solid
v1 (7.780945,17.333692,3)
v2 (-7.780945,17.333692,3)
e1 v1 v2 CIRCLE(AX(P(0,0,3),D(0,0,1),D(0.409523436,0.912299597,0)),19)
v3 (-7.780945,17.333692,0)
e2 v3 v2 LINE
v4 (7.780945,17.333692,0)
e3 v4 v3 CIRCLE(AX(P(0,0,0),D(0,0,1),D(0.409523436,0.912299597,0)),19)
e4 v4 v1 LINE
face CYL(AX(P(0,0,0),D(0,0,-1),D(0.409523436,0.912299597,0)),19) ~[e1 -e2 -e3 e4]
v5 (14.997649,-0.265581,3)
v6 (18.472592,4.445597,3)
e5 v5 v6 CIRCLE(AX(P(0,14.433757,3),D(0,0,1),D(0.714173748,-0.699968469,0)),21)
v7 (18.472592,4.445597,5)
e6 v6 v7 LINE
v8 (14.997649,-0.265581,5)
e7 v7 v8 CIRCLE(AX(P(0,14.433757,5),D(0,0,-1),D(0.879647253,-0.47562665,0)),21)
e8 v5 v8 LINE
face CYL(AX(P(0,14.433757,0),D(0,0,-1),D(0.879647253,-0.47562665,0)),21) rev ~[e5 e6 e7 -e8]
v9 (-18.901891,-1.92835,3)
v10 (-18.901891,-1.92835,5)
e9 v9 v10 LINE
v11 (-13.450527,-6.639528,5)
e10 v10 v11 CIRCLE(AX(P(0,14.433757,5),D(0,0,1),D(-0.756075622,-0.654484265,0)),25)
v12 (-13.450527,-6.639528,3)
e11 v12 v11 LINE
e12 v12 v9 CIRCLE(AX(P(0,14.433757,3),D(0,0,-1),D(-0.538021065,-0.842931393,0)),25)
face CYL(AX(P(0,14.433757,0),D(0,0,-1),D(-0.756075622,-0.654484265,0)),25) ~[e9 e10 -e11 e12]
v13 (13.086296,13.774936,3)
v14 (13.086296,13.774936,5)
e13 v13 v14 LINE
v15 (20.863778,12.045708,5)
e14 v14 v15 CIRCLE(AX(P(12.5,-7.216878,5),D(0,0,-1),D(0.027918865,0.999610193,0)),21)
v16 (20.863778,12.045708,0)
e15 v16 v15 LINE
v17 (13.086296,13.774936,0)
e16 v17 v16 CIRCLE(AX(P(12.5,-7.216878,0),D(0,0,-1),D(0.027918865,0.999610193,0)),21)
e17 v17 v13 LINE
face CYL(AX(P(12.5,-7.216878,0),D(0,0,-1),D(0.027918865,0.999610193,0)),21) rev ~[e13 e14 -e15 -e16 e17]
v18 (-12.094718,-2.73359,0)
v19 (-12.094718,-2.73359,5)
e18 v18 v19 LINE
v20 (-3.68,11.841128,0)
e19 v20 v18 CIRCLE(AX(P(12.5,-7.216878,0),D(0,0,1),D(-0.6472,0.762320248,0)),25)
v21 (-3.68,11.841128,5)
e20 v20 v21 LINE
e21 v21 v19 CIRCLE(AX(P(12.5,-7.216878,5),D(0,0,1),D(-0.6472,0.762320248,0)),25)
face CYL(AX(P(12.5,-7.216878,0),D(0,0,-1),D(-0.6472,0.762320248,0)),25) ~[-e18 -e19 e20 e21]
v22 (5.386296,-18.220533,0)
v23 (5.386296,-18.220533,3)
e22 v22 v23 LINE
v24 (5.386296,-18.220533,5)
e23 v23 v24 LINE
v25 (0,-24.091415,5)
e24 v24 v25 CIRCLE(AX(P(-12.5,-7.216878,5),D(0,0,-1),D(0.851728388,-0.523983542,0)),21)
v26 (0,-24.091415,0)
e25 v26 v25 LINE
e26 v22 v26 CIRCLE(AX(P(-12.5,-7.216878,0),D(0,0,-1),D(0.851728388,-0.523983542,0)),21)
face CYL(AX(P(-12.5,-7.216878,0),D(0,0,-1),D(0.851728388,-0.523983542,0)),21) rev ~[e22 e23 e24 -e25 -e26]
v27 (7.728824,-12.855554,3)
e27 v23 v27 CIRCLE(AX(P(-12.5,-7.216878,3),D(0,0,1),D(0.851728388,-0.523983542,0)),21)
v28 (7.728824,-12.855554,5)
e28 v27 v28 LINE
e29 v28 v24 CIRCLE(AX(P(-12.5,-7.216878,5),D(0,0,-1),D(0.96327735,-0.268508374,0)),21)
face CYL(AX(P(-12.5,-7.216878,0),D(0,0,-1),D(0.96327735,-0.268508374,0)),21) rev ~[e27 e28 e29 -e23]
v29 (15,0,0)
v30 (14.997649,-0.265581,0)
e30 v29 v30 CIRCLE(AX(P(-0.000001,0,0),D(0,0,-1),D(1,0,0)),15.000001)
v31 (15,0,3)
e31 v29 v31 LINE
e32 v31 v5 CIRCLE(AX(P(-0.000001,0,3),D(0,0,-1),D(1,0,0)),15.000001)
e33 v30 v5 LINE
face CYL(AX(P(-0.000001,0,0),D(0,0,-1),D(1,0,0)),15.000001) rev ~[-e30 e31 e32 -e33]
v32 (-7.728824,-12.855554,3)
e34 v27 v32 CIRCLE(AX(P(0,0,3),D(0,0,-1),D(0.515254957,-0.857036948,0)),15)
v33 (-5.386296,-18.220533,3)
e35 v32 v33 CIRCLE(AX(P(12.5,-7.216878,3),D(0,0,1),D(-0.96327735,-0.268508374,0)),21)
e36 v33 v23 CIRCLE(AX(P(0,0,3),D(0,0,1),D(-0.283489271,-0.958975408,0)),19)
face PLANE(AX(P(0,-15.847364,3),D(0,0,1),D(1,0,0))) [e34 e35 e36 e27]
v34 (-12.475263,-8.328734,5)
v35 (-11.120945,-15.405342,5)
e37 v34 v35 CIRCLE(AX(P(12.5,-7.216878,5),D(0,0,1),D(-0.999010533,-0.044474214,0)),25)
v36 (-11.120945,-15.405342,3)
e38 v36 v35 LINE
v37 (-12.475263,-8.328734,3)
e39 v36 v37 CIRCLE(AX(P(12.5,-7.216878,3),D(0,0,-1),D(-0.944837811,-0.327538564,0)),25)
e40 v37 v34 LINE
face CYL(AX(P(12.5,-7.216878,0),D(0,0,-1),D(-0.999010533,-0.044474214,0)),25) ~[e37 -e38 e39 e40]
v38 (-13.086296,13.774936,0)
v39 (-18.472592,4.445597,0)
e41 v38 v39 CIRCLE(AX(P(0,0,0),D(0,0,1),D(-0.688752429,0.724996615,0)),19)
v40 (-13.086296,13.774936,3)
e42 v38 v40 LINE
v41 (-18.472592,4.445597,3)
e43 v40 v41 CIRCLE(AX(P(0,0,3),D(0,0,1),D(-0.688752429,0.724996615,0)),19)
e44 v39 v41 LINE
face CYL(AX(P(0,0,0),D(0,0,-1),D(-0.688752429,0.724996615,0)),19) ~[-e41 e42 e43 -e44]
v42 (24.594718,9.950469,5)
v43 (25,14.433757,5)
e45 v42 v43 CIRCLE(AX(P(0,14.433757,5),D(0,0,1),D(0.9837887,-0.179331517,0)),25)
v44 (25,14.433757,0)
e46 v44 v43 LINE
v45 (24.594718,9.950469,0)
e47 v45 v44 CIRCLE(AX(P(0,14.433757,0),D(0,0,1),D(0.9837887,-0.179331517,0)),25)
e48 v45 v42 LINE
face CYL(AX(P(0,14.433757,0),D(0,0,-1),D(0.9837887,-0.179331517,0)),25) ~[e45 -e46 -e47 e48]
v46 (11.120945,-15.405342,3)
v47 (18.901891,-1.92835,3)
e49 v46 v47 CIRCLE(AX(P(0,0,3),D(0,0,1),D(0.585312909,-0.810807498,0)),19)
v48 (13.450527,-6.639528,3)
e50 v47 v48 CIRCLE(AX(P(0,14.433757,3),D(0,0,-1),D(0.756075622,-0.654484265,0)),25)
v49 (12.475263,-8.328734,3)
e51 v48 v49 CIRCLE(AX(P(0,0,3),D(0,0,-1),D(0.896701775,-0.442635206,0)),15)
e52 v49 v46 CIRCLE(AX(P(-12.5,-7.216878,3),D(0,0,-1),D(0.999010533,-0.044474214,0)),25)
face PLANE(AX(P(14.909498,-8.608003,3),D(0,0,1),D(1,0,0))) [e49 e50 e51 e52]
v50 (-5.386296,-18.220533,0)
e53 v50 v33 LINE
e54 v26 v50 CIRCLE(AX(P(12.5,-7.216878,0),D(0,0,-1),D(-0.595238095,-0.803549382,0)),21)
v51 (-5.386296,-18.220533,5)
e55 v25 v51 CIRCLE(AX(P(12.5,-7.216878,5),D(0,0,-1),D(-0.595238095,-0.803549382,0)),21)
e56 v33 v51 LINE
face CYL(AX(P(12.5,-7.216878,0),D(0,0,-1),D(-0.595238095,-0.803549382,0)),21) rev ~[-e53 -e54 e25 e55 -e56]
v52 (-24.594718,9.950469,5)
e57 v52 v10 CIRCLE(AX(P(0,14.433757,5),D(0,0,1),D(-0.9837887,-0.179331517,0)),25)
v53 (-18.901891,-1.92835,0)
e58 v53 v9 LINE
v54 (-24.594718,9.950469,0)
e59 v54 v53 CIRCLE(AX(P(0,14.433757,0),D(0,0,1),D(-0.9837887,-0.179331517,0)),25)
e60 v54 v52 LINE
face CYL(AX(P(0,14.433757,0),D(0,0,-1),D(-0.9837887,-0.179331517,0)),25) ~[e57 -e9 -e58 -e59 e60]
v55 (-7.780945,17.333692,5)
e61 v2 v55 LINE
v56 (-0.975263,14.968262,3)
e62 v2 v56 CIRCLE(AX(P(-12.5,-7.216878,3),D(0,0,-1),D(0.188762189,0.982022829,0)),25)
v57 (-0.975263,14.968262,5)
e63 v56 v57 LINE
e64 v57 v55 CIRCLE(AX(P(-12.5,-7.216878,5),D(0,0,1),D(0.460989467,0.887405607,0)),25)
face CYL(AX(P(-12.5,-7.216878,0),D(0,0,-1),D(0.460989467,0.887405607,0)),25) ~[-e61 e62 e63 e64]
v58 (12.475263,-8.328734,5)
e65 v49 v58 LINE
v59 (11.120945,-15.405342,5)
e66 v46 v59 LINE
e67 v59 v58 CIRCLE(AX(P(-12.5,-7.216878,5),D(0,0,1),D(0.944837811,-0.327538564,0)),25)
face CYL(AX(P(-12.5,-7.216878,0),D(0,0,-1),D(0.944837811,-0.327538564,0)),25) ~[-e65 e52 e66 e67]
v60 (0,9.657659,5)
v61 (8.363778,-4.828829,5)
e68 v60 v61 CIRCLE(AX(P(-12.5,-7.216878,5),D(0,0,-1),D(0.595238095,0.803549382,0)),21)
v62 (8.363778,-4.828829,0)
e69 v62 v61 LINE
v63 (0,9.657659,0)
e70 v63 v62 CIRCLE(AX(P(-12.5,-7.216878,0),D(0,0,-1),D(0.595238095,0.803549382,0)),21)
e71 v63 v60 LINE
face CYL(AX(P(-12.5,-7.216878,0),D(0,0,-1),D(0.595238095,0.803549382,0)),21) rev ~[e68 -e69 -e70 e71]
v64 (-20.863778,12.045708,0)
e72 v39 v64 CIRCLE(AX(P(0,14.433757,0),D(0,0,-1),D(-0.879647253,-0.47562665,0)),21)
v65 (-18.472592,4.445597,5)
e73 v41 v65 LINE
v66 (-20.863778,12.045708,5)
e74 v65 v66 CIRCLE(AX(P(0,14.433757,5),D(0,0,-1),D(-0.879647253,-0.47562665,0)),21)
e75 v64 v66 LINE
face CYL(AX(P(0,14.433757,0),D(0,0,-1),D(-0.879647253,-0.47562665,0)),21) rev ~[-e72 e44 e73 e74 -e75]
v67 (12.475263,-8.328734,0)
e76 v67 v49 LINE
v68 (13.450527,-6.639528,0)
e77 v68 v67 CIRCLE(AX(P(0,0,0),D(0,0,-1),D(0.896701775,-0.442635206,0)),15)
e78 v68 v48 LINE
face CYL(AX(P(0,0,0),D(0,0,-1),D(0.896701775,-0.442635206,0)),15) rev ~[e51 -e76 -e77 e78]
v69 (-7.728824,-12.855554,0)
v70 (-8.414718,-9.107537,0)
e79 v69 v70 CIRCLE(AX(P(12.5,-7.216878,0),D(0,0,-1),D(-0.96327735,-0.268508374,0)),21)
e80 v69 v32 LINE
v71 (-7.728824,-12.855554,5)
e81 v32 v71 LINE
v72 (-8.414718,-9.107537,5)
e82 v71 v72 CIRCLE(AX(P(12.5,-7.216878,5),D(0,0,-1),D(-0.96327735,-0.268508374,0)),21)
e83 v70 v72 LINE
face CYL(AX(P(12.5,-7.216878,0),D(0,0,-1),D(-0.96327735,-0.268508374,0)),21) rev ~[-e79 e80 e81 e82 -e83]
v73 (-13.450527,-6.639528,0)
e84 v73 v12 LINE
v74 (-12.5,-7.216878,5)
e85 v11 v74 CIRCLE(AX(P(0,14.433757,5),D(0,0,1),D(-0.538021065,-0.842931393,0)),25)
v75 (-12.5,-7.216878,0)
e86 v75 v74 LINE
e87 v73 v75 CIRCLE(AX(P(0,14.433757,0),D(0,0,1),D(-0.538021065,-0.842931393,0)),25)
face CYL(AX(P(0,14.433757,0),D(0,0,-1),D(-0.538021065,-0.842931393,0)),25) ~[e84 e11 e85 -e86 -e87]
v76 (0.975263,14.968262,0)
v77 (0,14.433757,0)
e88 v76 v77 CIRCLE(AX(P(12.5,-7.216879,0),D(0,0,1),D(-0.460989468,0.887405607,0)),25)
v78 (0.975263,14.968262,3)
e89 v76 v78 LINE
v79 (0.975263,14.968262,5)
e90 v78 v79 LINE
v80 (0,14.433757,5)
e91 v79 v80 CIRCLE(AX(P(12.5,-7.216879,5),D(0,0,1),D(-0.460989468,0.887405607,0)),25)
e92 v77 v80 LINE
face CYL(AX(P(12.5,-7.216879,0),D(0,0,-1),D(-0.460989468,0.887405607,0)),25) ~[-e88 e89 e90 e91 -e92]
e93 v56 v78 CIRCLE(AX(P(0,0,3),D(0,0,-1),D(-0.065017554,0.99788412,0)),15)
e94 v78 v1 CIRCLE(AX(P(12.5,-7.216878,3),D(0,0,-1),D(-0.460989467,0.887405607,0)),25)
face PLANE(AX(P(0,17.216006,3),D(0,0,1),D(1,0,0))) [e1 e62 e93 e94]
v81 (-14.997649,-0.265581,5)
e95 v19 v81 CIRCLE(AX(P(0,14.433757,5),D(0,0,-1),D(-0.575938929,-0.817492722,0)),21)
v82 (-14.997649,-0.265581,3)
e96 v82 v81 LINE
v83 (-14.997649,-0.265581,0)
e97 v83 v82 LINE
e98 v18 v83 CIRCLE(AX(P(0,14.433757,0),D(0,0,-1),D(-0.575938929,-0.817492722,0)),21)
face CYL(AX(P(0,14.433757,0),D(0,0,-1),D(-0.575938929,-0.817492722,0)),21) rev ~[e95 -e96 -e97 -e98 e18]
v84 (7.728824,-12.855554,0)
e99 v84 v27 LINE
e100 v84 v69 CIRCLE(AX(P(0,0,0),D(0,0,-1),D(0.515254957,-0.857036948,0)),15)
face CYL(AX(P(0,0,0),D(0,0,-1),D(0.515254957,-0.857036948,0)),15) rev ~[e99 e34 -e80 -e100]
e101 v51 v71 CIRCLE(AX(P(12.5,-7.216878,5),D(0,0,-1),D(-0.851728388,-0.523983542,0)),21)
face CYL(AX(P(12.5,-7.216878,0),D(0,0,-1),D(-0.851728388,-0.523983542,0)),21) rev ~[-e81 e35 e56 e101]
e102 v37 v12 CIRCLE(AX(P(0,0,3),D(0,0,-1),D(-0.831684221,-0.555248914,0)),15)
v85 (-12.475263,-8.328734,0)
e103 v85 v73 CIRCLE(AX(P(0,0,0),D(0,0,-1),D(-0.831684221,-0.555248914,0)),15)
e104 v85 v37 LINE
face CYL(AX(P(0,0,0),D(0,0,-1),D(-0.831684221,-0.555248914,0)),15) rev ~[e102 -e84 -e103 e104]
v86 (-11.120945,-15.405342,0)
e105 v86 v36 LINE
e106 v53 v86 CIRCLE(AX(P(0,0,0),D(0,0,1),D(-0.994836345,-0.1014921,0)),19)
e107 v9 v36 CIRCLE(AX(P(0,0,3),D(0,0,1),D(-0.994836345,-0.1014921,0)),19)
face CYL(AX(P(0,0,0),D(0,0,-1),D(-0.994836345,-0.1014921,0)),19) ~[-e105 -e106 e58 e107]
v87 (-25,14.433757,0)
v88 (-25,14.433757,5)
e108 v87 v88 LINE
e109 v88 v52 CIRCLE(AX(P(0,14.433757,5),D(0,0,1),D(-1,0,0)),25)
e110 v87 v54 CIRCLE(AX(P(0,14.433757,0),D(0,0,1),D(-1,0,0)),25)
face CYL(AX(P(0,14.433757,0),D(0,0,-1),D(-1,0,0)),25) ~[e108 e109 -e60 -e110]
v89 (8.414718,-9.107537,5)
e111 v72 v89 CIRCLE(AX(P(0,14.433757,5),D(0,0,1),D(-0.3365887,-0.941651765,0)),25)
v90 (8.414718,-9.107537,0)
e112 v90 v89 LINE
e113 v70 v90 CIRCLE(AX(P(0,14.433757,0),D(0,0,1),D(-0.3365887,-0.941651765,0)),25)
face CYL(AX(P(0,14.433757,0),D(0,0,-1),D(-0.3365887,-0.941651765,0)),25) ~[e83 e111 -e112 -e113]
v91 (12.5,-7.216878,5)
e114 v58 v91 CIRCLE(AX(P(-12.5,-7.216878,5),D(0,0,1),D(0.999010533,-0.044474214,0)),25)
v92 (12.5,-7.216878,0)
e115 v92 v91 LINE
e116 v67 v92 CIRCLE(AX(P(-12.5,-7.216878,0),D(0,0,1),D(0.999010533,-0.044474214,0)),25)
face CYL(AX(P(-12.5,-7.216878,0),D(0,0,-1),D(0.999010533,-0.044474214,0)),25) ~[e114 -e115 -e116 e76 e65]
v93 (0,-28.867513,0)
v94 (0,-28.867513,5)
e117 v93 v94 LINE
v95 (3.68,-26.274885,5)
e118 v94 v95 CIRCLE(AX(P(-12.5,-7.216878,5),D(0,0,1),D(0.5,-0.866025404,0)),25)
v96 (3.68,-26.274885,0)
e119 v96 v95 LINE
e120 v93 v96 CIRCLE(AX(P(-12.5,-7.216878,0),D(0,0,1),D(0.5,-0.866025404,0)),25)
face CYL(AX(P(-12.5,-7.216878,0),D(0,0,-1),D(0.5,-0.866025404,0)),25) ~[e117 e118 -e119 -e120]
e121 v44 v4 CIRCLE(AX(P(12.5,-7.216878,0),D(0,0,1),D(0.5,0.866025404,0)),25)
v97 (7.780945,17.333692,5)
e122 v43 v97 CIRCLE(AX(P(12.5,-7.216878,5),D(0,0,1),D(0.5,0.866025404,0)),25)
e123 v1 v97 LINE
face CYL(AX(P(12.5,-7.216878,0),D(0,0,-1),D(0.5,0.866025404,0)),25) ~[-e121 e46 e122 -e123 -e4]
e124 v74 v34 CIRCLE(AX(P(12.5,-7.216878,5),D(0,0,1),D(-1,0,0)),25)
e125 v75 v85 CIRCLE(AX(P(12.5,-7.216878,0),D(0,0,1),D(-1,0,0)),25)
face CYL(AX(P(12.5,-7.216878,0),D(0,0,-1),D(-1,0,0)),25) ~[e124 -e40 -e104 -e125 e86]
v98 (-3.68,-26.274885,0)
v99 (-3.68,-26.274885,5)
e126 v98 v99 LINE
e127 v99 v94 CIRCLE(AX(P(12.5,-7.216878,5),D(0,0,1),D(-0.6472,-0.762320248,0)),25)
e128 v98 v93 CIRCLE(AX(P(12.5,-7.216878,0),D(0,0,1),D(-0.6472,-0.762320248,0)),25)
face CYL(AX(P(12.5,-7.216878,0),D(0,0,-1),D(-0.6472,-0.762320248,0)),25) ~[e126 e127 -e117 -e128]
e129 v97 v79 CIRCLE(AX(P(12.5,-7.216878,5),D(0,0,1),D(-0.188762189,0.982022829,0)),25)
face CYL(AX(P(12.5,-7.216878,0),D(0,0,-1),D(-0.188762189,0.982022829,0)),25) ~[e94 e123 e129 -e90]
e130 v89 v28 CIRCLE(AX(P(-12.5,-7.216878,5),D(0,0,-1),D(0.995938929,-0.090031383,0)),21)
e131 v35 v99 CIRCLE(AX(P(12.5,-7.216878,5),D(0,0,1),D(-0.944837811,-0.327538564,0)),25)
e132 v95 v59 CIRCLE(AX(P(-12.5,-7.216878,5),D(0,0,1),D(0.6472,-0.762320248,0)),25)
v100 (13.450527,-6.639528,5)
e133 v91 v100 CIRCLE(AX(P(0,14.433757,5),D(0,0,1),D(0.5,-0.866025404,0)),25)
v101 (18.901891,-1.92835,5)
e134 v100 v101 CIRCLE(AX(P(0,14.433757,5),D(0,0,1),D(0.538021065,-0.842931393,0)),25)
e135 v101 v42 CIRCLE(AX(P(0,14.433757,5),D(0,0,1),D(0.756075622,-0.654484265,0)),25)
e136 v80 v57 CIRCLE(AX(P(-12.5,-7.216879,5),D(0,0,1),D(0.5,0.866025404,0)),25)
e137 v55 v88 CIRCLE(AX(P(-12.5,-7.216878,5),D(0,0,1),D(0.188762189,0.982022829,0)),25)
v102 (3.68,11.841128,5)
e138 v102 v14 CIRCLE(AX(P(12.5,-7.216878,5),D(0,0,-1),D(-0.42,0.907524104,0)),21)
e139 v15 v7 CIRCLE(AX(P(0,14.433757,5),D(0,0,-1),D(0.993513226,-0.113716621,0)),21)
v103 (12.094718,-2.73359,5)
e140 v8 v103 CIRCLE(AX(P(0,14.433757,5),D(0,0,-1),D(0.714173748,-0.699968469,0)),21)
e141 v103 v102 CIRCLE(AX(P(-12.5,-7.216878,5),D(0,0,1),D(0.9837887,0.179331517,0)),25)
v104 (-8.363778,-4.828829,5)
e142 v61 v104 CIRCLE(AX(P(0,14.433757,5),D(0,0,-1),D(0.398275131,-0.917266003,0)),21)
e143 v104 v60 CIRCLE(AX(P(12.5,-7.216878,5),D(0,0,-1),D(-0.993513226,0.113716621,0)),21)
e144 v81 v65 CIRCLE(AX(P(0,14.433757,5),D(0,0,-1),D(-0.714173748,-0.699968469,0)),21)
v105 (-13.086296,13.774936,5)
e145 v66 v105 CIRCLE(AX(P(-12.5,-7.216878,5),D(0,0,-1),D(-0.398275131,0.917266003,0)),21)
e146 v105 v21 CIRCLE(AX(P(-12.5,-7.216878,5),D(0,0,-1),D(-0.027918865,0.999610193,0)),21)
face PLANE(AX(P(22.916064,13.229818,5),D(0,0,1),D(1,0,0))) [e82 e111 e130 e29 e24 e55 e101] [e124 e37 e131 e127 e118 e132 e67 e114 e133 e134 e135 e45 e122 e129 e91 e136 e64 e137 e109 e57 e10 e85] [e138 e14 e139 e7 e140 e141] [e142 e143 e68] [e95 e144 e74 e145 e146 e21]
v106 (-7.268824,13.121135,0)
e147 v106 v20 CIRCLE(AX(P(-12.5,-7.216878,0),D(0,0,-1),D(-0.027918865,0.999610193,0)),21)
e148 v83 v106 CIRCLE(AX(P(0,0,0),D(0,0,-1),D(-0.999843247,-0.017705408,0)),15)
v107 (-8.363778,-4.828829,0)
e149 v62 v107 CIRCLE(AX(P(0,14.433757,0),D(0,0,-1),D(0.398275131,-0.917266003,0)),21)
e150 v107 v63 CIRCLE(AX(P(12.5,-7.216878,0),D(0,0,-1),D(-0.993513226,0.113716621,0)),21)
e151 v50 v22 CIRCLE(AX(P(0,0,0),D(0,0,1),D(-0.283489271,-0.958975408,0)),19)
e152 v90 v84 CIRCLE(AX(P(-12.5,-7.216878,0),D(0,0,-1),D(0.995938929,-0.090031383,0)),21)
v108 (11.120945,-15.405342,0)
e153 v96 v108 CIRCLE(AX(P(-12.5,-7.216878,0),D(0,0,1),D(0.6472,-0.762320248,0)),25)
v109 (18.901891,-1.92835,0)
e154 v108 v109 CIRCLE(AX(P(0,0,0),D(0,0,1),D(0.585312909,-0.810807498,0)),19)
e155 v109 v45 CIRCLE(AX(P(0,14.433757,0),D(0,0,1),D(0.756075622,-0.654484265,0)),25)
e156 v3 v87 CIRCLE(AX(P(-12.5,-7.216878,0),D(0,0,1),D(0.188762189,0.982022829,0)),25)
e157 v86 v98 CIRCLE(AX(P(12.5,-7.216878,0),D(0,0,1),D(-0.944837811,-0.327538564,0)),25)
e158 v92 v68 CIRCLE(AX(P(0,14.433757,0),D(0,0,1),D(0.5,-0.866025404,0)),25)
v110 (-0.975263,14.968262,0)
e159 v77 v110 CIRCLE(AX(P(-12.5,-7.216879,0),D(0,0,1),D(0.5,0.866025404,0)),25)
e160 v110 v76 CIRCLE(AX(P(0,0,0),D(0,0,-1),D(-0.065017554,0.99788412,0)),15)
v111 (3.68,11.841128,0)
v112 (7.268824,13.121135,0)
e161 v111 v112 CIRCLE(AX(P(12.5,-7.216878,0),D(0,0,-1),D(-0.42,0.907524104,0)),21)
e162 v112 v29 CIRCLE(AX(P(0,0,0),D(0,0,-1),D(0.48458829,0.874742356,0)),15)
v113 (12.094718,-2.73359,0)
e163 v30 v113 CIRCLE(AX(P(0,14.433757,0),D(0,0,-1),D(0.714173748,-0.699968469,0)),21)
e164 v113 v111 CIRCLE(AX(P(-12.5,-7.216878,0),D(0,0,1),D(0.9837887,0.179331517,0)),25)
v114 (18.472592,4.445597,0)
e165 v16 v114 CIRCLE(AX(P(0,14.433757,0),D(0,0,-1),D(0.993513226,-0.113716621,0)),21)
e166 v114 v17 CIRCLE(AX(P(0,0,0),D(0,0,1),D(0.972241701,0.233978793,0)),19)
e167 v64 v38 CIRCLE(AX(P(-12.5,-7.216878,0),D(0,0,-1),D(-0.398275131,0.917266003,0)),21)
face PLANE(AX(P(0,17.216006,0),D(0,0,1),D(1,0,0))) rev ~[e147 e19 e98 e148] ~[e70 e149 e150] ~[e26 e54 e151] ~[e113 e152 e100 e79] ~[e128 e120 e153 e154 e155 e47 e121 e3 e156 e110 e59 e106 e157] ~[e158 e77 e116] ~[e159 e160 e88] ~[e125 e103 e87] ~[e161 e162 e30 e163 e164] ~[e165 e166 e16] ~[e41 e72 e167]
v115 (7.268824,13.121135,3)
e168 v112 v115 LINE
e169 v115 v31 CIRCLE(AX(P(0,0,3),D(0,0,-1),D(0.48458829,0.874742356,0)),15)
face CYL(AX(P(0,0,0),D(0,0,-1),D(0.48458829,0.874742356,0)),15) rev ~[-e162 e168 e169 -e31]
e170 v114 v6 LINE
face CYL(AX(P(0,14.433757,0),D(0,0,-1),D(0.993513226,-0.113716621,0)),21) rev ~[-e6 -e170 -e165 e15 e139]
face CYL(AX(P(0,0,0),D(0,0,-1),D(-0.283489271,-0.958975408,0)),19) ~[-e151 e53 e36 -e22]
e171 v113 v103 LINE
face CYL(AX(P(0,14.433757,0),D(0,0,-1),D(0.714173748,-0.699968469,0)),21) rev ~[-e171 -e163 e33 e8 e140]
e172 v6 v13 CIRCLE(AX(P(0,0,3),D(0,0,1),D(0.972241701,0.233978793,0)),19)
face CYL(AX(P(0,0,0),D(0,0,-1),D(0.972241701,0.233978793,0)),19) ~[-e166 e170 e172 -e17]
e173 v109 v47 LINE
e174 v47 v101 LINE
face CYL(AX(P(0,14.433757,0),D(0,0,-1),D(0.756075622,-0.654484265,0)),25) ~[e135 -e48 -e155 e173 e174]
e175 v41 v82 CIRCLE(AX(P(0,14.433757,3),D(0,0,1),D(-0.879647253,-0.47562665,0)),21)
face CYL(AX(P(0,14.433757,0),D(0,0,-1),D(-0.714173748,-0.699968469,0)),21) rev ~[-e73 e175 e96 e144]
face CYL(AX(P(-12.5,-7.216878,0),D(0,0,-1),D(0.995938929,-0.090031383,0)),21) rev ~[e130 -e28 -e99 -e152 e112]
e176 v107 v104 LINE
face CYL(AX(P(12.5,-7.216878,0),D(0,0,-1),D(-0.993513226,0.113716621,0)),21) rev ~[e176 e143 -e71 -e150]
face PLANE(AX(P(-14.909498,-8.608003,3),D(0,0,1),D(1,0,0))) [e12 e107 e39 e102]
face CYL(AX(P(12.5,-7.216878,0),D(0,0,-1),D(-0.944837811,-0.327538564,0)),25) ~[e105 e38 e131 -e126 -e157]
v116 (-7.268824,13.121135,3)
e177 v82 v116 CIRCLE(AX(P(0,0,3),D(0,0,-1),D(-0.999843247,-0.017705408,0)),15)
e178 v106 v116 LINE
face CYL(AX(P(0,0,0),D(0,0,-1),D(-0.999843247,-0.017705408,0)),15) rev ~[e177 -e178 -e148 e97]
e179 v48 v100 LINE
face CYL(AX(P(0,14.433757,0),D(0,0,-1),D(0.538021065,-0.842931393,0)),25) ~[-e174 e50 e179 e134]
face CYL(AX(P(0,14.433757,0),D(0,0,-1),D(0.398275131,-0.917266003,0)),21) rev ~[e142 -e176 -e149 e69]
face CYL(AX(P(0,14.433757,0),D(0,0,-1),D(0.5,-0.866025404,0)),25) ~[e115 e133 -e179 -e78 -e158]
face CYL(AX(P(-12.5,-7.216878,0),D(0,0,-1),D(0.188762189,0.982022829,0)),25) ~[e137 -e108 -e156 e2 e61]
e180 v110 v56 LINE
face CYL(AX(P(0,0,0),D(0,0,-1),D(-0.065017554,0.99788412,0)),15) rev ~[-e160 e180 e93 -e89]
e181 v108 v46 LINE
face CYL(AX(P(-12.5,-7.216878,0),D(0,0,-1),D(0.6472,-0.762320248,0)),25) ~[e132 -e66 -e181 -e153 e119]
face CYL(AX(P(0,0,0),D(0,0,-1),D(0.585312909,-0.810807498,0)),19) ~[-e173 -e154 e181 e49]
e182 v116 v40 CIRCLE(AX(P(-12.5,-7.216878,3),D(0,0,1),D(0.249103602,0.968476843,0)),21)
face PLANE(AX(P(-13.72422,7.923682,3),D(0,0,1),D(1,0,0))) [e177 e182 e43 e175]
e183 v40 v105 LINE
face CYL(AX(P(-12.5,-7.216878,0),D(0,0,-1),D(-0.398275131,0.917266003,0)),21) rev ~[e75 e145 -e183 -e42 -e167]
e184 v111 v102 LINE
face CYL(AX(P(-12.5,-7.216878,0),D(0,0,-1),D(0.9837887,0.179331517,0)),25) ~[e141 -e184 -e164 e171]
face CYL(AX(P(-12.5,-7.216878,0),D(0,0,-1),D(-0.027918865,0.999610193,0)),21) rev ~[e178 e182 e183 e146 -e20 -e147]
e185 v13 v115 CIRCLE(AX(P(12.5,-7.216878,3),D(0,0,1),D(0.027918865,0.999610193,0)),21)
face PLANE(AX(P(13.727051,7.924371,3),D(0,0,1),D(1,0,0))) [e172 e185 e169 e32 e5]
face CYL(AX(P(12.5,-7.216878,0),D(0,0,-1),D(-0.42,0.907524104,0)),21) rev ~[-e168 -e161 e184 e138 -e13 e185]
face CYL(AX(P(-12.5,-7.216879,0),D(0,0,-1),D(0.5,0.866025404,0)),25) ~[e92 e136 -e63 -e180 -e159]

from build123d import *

# Parameters (mm, degrees)
F1_DEPTH = 5
F2_DEPTH = 3


with BuildPart() as f1:
    # F0 (on Top) → F1 (new body)
    with BuildSketch(Plane.XY):
        with BuildLine():
            ThreePointArc((24.5947175074, 9.9504687923), (24.8984732231, 12.1829721649), (25, 14.4337567297))
            ThreePointArc((25, 14.4337567297), (23, 15.4712242442), (20.9147175074, 16.3244157642))
            ThreePointArc((20.9147175074, 16.3244157642), (20.9786685428, 15.3800474736), (21, 14.4337567297))
            ThreePointArc((21, 14.4337567297), (20.9659167777, 13.237791149), (20.8637777457, 12.0457076978))
            ThreePointArc((20.8637777457, 12.0457076978), (22.7827532073, 11.0933643008), (24.5947175074, 9.9504687923))
        make_face()
        with BuildLine():
            ThreePointArc((18.901890558, -1.9283498991), (22.544740222, 3.6293739003), (24.5947175074, 9.9504687923))
            ThreePointArc((24.5947175074, 9.9504687923), (22.7827532073, 11.0933643008), (20.8637777457, 12.0457076978))
            ThreePointArc((20.8637777457, 12.0457076978), (20.0319225906, 8.1312114245), (18.4725923104, 4.4455970728))
            ThreePointArc((18.4725923104, 4.4455970728), (18.8676873768, 2.2383862605), (19, 0))
            ThreePointArc((19, 0), (18.9754567877, -0.9654220315), (18.901890558, -1.9283498991))
        make_face()
        with BuildLine():
            ThreePointArc((13.4505266316, -6.6395280957), (16.3468200119, -4.4813556278), (18.901890558, -1.9283498991))
            ThreePointArc((18.901890558, -1.9283498991), (18.9754567877, -0.9654220315), (19, 0))
            ThreePointArc((19, 0), (18.8676873768, 2.2383862605), (18.4725923104, 4.4455970728))
            ThreePointArc((18.4725923104, 4.4455970728), (16.900090485, 1.9683268696), (14.9976487046, -0.2655811238))
            ThreePointArc((14.9976487046, -0.2655811238), (14.5767441491, -3.5381534747), (13.4505266316, -6.6395280957))
        make_face()
        with BuildLine():
            ThreePointArc((12.5, -7.2168783649), (12.9784741571, -6.9334894324), (13.4505266316, -6.6395280957))
            ThreePointArc((13.4505266316, -6.6395280957), (14.5767441491, -3.5381534747), (14.9976487046, -0.2655811238))
            ThreePointArc((14.9976487046, -0.2655811238), (13.6022734946, -1.5655606237), (12.0947175074, -2.7335904275))
            ThreePointArc((12.0947175074, -2.7335904275), (12.3984732231, -4.9660938001), (12.5, -7.2168783649))
        make_face()
        with BuildLine():
            ThreePointArc((8.4147175074, -9.1075373993), (10.5, -8.2543458793), (12.5, -7.2168783649))
            ThreePointArc((12.5, -7.2168783649), (12.3984732231, -4.9660938001), (12.0947175074, -2.7335904275))
            ThreePointArc((12.0947175074, -2.7335904275), (10.2827532073, -3.876485936), (8.3637777457, -4.8288293329))
            ThreePointArc((8.3637777457, -4.8288293329), (8.4659167777, -6.0209127841), (8.5, -7.2168783649))
            ThreePointArc((8.5, -7.2168783649), (8.4786685428, -8.1631691088), (8.4147175074, -9.1075373993))
        make_face()
        with BuildLine():
            ThreePointArc((-8.4147175074, -9.1075373993), (0, -10.5662432703), (8.4147175074, -9.1075373993))
            ThreePointArc((8.4147175074, -9.1075373993), (8.4786685428, -8.1631691088), (8.5, -7.2168783649))
            ThreePointArc((8.5, -7.2168783649), (8.4659167777, -6.0209127841), (8.3637777457, -4.8288293329))
            ThreePointArc((8.3637777457, -4.8288293329), (0, -6.5662432703), (-8.3637777457, -4.8288293329))
            ThreePointArc((-8.3637777457, -4.8288293329), (-8.4985119016, -6.9668825304), (-8.4147175074, -9.1075373993))
        make_face()
        with BuildLine():
            ThreePointArc((-12.0947175074, -2.7335904275), (-12.3984732231, -4.9660938001), (-12.5, -7.2168783649))
            ThreePointArc((-12.5, -7.2168783649), (-10.5, -8.2543458793), (-8.4147175074, -9.1075373993))
            ThreePointArc((-8.4147175074, -9.1075373993), (-8.4985119016, -6.9668825304), (-8.3637777457, -4.8288293329))
            ThreePointArc((-8.3637777457, -4.8288293329), (-10.2827532073, -3.876485936), (-12.0947175074, -2.7335904275))
        make_face()
        with BuildLine():
            ThreePointArc((-14.9976487046, -0.2655811238), (-14.5767441491, -3.5381534747), (-13.4505266316, -6.6395280957))
            ThreePointArc((-13.4505266316, -6.6395280957), (-12.9784741571, -6.9334894324), (-12.5, -7.2168783649))
            ThreePointArc((-12.5, -7.2168783649), (-12.3984732231, -4.9660938001), (-12.0947175074, -2.7335904275))
            ThreePointArc((-12.0947175074, -2.7335904275), (-13.6022734946, -1.5655606237), (-14.9976487046, -0.2655811238))
        make_face()
        with BuildLine():
            ThreePointArc((-18.4725923104, 4.4455970728), (-18.9570512586, 1.2767958254), (-18.901890558, -1.9283498991))
            ThreePointArc((-18.901890558, -1.9283498991), (-16.3468200119, -4.4813556278), (-13.4505266316, -6.6395280957))
            ThreePointArc((-13.4505266316, -6.6395280957), (-14.5767441491, -3.5381534747), (-14.9976487046, -0.2655811238))
            ThreePointArc((-14.9976487046, -0.2655811238), (-16.900090485, 1.9683268696), (-18.4725923104, 4.4455970728))
        make_face()
        with BuildLine():
            ThreePointArc((-20.8637777457, 12.0457076978), (-22.7827532073, 11.0933643008), (-24.5947175074, 9.9504687923))
            ThreePointArc((-24.5947175074, 9.9504687923), (-22.544740222, 3.6293739003), (-18.901890558, -1.9283498991))
            ThreePointArc((-18.901890558, -1.9283498991), (-18.9570512586, 1.2767958254), (-18.4725923104, 4.4455970728))
            ThreePointArc((-18.4725923104, 4.4455970728), (-20.0319225906, 8.1312114245), (-20.8637777457, 12.0457076978))
        make_face()
        with BuildLine():
            ThreePointArc((-20.9147175074, 16.3244157642), (-23, 15.4712242442), (-25, 14.4337567297))
            ThreePointArc((-25, 14.4337567297), (-24.8984732231, 12.1829721649), (-24.5947175074, 9.9504687923))
            ThreePointArc((-24.5947175074, 9.9504687923), (-22.7827532073, 11.0933643008), (-20.8637777457, 12.0457076978))
            ThreePointArc((-20.8637777457, 12.0457076978), (-20.9985119016, 14.1837608953), (-20.9147175074, 16.3244157642))
        make_face()
        with BuildLine():
            ThreePointArc((-7.780945279, 17.3336923523), (-14.4155001085, 17.7096308038), (-20.9147175074, 16.3244157642))
            ThreePointArc((-20.9147175074, 16.3244157642), (-20.9985119016, 14.1837608953), (-20.8637777457, 12.0457076978))
            ThreePointArc((-20.8637777457, 12.0457076978), (-17.0577969525, 13.2825481378), (-13.0862961552, 13.7749356782))
            ThreePointArc((-13.0862961552, 13.7749356782), (-10.5842632495, 15.7788900581), (-7.780945279, 17.3336923523))
        make_face()
        with BuildLine():
            ThreePointArc((-0.9752633158, 14.9682618051), (-4.2924421889, 16.3974392153), (-7.780945279, 17.3336923523))
            ThreePointArc((-7.780945279, 17.3336923523), (-10.5842632495, 15.7788900581), (-13.0862961552, 13.7749356782))
            ThreePointArc((-13.0862961552, 13.7749356782), (-10.1546663145, 13.6517442515), (-7.2688243523, 13.1211353371))
            ThreePointArc((-7.2688243523, 13.1211353371), (-4.224241283, 14.392907475), (-0.9752633158, 14.9682618051))
        make_face()
        with BuildLine():
            ThreePointArc((0, 14.4337567297), (-0.4846590933, 14.7064330386), (-0.9752633158, 14.9682618051))
            ThreePointArc((-0.9752633158, 14.9682618051), (-4.224241283, 14.392907475), (-7.2688243523, 13.1211353371))
            ThreePointArc((-7.2688243523, 13.1211353371), (-5.445321476, 12.5626947074), (-3.68, 11.8411278268))
            ThreePointArc((-3.68, 11.8411278268), (-1.8984732231, 13.2204396794), (0, 14.4337567297))
        make_face()
        with BuildLine():
            ThreePointArc((3.68, 11.8411278268), (1.8984732231, 13.2204396794), (0, 14.4337567297))
            ThreePointArc((0, 14.4337567297), (-1.8984732231, 13.2204396794), (-3.68, 11.8411278268))
            ThreePointArc((-3.68, 11.8411278268), (-1.7842413057, 10.8433684664), (0, 9.6576586658))
            ThreePointArc((0, 9.6576586658), (1.7842413057, 10.8433684664), (3.68, 11.8411278268))
        make_face()
        with BuildLine():
            ThreePointArc((8.3637777457, -4.8288293329), (10.2827532073, -3.876485936), (12.0947175074, -2.7335904275))
            ThreePointArc((12.0947175074, -2.7335904275), (9.1506350946, 5.2831216351), (3.68, 11.8411278268))
            ThreePointArc((3.68, 11.8411278268), (1.7842413057, 10.8433684664), (0, 9.6576586658))
            ThreePointArc((0, 9.6576586658), (5.6865334795, 3.2831216351), (8.3637777457, -4.8288293329))
        make_face()
        with BuildLine():
            ThreePointArc((12.4752633158, -8.3287337094), (12.4938150639, -7.7729436062), (12.5, -7.2168783649))
            ThreePointArc((12.5, -7.2168783649), (10.5, -8.2543458793), (8.4147175074, -9.1075373993))
            ThreePointArc((8.4147175074, -9.1075373993), (8.1569520186, -10.9971340837), (7.7288243523, -12.8555542133))
            ThreePointArc((7.7288243523, -12.8555542133), (10.3525028661, -10.8547540003), (12.4752633158, -8.3287337094))
        make_face()
        with BuildLine():
            ThreePointArc((5.3862961552, -18.2205327509), (8.3727880091, -17.0556858835), (11.120945279, -15.4053424532))
            ThreePointArc((11.120945279, -15.4053424532), (12.054377823, -11.9160835875), (12.4752633158, -8.3287337094))
            ThreePointArc((12.4752633158, -8.3287337094), (10.3525028661, -10.8547540003), (7.7288243523, -12.8555542133))
            ThreePointArc((7.7288243523, -12.8555542133), (6.7454241705, -15.620071121), (5.3862961552, -18.2205327509))
        make_face()
        with BuildLine():
            ThreePointArc((0, -24.0914153956), (1.7842413057, -25.2771251961), (3.68, -26.2748845565))
            ThreePointArc((3.68, -26.2748845565), (8.1292401135, -21.3390047041), (11.120945279, -15.4053424532))
            ThreePointArc((11.120945279, -15.4053424532), (8.3727880091, -17.0556858835), (5.3862961552, -18.2205327509))
            ThreePointArc((5.3862961552, -18.2205327509), (2.9741256381, -21.4137595623), (0, -24.0914153956))
        make_face()
        with BuildLine():
            ThreePointArc((-3.68, -26.2748845565), (-1.8984732231, -27.6541964091), (0, -28.8675134595))
            ThreePointArc((0, -28.8675134595), (1.8984732231, -27.6541964091), (3.68, -26.2748845565))
            ThreePointArc((3.68, -26.2748845565), (1.7842413057, -25.2771251961), (0, -24.0914153956))
            ThreePointArc((0, -24.0914153956), (-1.7842413057, -25.2771251961), (-3.68, -26.2748845565))
        make_face()
        with BuildLine():
            ThreePointArc((-11.120945279, -15.4053424532), (-8.1292401135, -21.3390047041), (-3.68, -26.2748845565))
            ThreePointArc((-3.68, -26.2748845565), (-1.7842413057, -25.2771251961), (0, -24.0914153956))
            ThreePointArc((0, -24.0914153956), (-2.9741256381, -21.4137595624), (-5.3862961552, -18.220532751))
            ThreePointArc((-5.3862961552, -18.2205327509), (-8.3727880091, -17.0556858835), (-11.120945279, -15.4053424532))
        make_face()
        with BuildLine():
            ThreePointArc((-12.4752633158, -8.3287337094), (-12.054377823, -11.9160835875), (-11.120945279, -15.4053424532))
            ThreePointArc((-11.120945279, -15.4053424532), (-8.3727880091, -17.0556858835), (-5.3862961552, -18.2205327509))
            ThreePointArc((-5.3862961552, -18.220532751), (-6.7454241705, -15.620071121), (-7.7288243523, -12.8555542133))
            ThreePointArc((-7.7288243523, -12.8555542133), (-10.3525028661, -10.8547540003), (-12.4752633158, -8.3287337094))
        make_face()
        with BuildLine():
            ThreePointArc((-8.4147175074, -9.1075373993), (-10.5, -8.2543458793), (-12.5, -7.2168783649))
            ThreePointArc((-12.5, -7.2168783649), (-12.4938150639, -7.7729436062), (-12.4752633158, -8.3287337094))
            ThreePointArc((-12.4752633158, -8.3287337094), (-10.3525028661, -10.8547540003), (-7.7288243523, -12.8555542133))
            ThreePointArc((-7.7288243523, -12.8555542133), (-8.1569520186, -10.9971340837), (-8.4147175074, -9.1075373993))
        make_face()
        with BuildLine():
            ThreePointArc((0, 9.6576586658), (-1.7842413057, 10.8433684664), (-3.68, 11.8411278268))
            ThreePointArc((-3.68, 11.8411278268), (-9.1506350946, 5.2831216351), (-12.0947175074, -2.7335904275))
            ThreePointArc((-12.0947175074, -2.7335904275), (-10.2827532073, -3.876485936), (-8.3637777457, -4.8288293329))
            ThreePointArc((-8.3637777457, -4.8288293329), (-5.6865334795, 3.2831216351), (0, 9.6576586658))
        make_face()
        with BuildLine():
            ThreePointArc((7.2688243523, 13.1211353371), (4.224241283, 14.392907475), (0.9752633158, 14.9682618051))
            ThreePointArc((0.9752633158, 14.9682618051), (0.4846590933, 14.7064330386), (0, 14.4337567297))
            ThreePointArc((0, 14.4337567297), (1.8984732231, 13.2204396794), (3.68, 11.8411278268))
            ThreePointArc((3.68, 11.8411278268), (5.445321476, 12.5626947074), (7.2688243523, 13.1211353371))
        make_face()
        with BuildLine():
            ThreePointArc((13.0862961552, 13.7749356782), (10.5842632495, 15.7788900581), (7.780945279, 17.3336923523))
            ThreePointArc((7.780945279, 17.3336923523), (4.2924421889, 16.3974392153), (0.9752633158, 14.9682618051))
            ThreePointArc((0.9752633158, 14.9682618051), (4.224241283, 14.392907475), (7.2688243523, 13.1211353371))
            ThreePointArc((7.2688243523, 13.1211353371), (10.1546663145, 13.6517442515), (13.0862961552, 13.7749356782))
        make_face()
        with BuildLine():
            ThreePointArc((21, 14.4337567297), (20.9786685428, 15.3800474736), (20.9147175074, 16.3244157642))
            ThreePointArc((20.9147175074, 16.3244157642), (14.4155001085, 17.7096308038), (7.780945279, 17.3336923523))
            ThreePointArc((7.780945279, 17.3336923523), (10.5842632495, 15.7788900581), (13.0862961552, 13.7749356782))
            ThreePointArc((13.0862961552, 13.7749356782), (17.0577969525, 13.2825481378), (20.8637777457, 12.0457076978))
            ThreePointArc((20.8637777457, 12.0457076978), (20.9659167777, 13.237791149), (21, 14.4337567297))
        make_face()
    extrude(amount=F1_DEPTH)

    # F0 (on Top) → F2 (join)
    with BuildSketch(Plane.XY):
        with BuildLine():
            ThreePointArc((0.9752633158, 14.9682618051), (4.2924421889, 16.3974392153), (7.780945279, 17.3336923523))
            ThreePointArc((7.780945279, 17.3336923523), (0, 19), (-7.780945279, 17.3336923523))
            ThreePointArc((-7.780945279, 17.3336923523), (-4.2924421889, 16.3974392153), (-0.9752633158, 14.9682618051))
            ThreePointArc((-0.9752633158, 14.9682618051), (0, 15), (0.9752633158, 14.9682618051))
        make_face()
        with BuildLine():
            ThreePointArc((14.9976487046, -0.2655811238), (16.900090485, 1.9683268696), (18.4725923104, 4.4455970728))
            ThreePointArc((18.4725923104, 4.4455970728), (16.4544826719, 9.5), (13.0862961552, 13.7749356782))
            ThreePointArc((13.0862961552, 13.7749356782), (10.1546663145, 13.6517442515), (7.2688243523, 13.1211353371))
            ThreePointArc((7.2688243523, 13.1211353371), (12.9234740934, 7.6147105892), (15, 0))
            ThreePointArc((15, 0), (14.9994121646, -0.132795766), (14.9976487046, -0.2655811238))
        make_face()
        with BuildLine():
            ThreePointArc((11.120945279, -15.4053424532), (16.4544826719, -9.5), (18.901890558, -1.9283498991))
            ThreePointArc((18.901890558, -1.9283498991), (16.3468200119, -4.4813556278), (13.4505266316, -6.6395280957))
            ThreePointArc((13.4505266316, -6.6395280957), (12.9903810568, -7.5), (12.4752633158, -8.3287337094))
            ThreePointArc((12.4752633158, -8.3287337094), (12.054377823, -11.9160835875), (11.120945279, -15.4053424532))
        make_face()
        with BuildLine():
            ThreePointArc((-5.3862961552, -18.2205327509), (0, -19), (5.3862961552, -18.2205327509))
            ThreePointArc((5.3862961552, -18.2205327509), (6.7454241705, -15.620071121), (7.7288243523, -12.8555542133))
            ThreePointArc((7.7288243523, -12.8555542133), (0, -15), (-7.7288243523, -12.8555542133))
            ThreePointArc((-7.7288243523, -12.8555542133), (-6.7454241705, -15.620071121), (-5.3862961552, -18.220532751))
        make_face()
        with BuildLine():
            ThreePointArc((-13.4505266316, -6.6395280957), (-16.3468200119, -4.4813556278), (-18.901890558, -1.9283498991))
            ThreePointArc((-18.901890558, -1.9283498991), (-16.4544826719, -9.5), (-11.120945279, -15.4053424532))
            ThreePointArc((-11.120945279, -15.4053424532), (-12.054377823, -11.9160835875), (-12.4752633158, -8.3287337094))
            ThreePointArc((-12.4752633158, -8.3287337094), (-12.9903810568, -7.5), (-13.4505266316, -6.6395280957))
        make_face()
        with BuildLine():
            ThreePointArc((-13.0862961552, 13.7749356782), (-16.4544826719, 9.5), (-18.4725923104, 4.4455970728))
            ThreePointArc((-18.4725923104, 4.4455970728), (-16.900090485, 1.9683268696), (-14.9976487046, -0.2655811238))
            ThreePointArc((-14.9976487046, -0.2655811238), (-12.9903810568, 7.5), (-7.2688243523, 13.1211353371))
            ThreePointArc((-7.2688243523, 13.1211353371), (-10.1546663145, 13.6517442515), (-13.0862961552, 13.7749356782))
        make_face()
    extrude(amount=F2_DEPTH)


solid = f1.part
